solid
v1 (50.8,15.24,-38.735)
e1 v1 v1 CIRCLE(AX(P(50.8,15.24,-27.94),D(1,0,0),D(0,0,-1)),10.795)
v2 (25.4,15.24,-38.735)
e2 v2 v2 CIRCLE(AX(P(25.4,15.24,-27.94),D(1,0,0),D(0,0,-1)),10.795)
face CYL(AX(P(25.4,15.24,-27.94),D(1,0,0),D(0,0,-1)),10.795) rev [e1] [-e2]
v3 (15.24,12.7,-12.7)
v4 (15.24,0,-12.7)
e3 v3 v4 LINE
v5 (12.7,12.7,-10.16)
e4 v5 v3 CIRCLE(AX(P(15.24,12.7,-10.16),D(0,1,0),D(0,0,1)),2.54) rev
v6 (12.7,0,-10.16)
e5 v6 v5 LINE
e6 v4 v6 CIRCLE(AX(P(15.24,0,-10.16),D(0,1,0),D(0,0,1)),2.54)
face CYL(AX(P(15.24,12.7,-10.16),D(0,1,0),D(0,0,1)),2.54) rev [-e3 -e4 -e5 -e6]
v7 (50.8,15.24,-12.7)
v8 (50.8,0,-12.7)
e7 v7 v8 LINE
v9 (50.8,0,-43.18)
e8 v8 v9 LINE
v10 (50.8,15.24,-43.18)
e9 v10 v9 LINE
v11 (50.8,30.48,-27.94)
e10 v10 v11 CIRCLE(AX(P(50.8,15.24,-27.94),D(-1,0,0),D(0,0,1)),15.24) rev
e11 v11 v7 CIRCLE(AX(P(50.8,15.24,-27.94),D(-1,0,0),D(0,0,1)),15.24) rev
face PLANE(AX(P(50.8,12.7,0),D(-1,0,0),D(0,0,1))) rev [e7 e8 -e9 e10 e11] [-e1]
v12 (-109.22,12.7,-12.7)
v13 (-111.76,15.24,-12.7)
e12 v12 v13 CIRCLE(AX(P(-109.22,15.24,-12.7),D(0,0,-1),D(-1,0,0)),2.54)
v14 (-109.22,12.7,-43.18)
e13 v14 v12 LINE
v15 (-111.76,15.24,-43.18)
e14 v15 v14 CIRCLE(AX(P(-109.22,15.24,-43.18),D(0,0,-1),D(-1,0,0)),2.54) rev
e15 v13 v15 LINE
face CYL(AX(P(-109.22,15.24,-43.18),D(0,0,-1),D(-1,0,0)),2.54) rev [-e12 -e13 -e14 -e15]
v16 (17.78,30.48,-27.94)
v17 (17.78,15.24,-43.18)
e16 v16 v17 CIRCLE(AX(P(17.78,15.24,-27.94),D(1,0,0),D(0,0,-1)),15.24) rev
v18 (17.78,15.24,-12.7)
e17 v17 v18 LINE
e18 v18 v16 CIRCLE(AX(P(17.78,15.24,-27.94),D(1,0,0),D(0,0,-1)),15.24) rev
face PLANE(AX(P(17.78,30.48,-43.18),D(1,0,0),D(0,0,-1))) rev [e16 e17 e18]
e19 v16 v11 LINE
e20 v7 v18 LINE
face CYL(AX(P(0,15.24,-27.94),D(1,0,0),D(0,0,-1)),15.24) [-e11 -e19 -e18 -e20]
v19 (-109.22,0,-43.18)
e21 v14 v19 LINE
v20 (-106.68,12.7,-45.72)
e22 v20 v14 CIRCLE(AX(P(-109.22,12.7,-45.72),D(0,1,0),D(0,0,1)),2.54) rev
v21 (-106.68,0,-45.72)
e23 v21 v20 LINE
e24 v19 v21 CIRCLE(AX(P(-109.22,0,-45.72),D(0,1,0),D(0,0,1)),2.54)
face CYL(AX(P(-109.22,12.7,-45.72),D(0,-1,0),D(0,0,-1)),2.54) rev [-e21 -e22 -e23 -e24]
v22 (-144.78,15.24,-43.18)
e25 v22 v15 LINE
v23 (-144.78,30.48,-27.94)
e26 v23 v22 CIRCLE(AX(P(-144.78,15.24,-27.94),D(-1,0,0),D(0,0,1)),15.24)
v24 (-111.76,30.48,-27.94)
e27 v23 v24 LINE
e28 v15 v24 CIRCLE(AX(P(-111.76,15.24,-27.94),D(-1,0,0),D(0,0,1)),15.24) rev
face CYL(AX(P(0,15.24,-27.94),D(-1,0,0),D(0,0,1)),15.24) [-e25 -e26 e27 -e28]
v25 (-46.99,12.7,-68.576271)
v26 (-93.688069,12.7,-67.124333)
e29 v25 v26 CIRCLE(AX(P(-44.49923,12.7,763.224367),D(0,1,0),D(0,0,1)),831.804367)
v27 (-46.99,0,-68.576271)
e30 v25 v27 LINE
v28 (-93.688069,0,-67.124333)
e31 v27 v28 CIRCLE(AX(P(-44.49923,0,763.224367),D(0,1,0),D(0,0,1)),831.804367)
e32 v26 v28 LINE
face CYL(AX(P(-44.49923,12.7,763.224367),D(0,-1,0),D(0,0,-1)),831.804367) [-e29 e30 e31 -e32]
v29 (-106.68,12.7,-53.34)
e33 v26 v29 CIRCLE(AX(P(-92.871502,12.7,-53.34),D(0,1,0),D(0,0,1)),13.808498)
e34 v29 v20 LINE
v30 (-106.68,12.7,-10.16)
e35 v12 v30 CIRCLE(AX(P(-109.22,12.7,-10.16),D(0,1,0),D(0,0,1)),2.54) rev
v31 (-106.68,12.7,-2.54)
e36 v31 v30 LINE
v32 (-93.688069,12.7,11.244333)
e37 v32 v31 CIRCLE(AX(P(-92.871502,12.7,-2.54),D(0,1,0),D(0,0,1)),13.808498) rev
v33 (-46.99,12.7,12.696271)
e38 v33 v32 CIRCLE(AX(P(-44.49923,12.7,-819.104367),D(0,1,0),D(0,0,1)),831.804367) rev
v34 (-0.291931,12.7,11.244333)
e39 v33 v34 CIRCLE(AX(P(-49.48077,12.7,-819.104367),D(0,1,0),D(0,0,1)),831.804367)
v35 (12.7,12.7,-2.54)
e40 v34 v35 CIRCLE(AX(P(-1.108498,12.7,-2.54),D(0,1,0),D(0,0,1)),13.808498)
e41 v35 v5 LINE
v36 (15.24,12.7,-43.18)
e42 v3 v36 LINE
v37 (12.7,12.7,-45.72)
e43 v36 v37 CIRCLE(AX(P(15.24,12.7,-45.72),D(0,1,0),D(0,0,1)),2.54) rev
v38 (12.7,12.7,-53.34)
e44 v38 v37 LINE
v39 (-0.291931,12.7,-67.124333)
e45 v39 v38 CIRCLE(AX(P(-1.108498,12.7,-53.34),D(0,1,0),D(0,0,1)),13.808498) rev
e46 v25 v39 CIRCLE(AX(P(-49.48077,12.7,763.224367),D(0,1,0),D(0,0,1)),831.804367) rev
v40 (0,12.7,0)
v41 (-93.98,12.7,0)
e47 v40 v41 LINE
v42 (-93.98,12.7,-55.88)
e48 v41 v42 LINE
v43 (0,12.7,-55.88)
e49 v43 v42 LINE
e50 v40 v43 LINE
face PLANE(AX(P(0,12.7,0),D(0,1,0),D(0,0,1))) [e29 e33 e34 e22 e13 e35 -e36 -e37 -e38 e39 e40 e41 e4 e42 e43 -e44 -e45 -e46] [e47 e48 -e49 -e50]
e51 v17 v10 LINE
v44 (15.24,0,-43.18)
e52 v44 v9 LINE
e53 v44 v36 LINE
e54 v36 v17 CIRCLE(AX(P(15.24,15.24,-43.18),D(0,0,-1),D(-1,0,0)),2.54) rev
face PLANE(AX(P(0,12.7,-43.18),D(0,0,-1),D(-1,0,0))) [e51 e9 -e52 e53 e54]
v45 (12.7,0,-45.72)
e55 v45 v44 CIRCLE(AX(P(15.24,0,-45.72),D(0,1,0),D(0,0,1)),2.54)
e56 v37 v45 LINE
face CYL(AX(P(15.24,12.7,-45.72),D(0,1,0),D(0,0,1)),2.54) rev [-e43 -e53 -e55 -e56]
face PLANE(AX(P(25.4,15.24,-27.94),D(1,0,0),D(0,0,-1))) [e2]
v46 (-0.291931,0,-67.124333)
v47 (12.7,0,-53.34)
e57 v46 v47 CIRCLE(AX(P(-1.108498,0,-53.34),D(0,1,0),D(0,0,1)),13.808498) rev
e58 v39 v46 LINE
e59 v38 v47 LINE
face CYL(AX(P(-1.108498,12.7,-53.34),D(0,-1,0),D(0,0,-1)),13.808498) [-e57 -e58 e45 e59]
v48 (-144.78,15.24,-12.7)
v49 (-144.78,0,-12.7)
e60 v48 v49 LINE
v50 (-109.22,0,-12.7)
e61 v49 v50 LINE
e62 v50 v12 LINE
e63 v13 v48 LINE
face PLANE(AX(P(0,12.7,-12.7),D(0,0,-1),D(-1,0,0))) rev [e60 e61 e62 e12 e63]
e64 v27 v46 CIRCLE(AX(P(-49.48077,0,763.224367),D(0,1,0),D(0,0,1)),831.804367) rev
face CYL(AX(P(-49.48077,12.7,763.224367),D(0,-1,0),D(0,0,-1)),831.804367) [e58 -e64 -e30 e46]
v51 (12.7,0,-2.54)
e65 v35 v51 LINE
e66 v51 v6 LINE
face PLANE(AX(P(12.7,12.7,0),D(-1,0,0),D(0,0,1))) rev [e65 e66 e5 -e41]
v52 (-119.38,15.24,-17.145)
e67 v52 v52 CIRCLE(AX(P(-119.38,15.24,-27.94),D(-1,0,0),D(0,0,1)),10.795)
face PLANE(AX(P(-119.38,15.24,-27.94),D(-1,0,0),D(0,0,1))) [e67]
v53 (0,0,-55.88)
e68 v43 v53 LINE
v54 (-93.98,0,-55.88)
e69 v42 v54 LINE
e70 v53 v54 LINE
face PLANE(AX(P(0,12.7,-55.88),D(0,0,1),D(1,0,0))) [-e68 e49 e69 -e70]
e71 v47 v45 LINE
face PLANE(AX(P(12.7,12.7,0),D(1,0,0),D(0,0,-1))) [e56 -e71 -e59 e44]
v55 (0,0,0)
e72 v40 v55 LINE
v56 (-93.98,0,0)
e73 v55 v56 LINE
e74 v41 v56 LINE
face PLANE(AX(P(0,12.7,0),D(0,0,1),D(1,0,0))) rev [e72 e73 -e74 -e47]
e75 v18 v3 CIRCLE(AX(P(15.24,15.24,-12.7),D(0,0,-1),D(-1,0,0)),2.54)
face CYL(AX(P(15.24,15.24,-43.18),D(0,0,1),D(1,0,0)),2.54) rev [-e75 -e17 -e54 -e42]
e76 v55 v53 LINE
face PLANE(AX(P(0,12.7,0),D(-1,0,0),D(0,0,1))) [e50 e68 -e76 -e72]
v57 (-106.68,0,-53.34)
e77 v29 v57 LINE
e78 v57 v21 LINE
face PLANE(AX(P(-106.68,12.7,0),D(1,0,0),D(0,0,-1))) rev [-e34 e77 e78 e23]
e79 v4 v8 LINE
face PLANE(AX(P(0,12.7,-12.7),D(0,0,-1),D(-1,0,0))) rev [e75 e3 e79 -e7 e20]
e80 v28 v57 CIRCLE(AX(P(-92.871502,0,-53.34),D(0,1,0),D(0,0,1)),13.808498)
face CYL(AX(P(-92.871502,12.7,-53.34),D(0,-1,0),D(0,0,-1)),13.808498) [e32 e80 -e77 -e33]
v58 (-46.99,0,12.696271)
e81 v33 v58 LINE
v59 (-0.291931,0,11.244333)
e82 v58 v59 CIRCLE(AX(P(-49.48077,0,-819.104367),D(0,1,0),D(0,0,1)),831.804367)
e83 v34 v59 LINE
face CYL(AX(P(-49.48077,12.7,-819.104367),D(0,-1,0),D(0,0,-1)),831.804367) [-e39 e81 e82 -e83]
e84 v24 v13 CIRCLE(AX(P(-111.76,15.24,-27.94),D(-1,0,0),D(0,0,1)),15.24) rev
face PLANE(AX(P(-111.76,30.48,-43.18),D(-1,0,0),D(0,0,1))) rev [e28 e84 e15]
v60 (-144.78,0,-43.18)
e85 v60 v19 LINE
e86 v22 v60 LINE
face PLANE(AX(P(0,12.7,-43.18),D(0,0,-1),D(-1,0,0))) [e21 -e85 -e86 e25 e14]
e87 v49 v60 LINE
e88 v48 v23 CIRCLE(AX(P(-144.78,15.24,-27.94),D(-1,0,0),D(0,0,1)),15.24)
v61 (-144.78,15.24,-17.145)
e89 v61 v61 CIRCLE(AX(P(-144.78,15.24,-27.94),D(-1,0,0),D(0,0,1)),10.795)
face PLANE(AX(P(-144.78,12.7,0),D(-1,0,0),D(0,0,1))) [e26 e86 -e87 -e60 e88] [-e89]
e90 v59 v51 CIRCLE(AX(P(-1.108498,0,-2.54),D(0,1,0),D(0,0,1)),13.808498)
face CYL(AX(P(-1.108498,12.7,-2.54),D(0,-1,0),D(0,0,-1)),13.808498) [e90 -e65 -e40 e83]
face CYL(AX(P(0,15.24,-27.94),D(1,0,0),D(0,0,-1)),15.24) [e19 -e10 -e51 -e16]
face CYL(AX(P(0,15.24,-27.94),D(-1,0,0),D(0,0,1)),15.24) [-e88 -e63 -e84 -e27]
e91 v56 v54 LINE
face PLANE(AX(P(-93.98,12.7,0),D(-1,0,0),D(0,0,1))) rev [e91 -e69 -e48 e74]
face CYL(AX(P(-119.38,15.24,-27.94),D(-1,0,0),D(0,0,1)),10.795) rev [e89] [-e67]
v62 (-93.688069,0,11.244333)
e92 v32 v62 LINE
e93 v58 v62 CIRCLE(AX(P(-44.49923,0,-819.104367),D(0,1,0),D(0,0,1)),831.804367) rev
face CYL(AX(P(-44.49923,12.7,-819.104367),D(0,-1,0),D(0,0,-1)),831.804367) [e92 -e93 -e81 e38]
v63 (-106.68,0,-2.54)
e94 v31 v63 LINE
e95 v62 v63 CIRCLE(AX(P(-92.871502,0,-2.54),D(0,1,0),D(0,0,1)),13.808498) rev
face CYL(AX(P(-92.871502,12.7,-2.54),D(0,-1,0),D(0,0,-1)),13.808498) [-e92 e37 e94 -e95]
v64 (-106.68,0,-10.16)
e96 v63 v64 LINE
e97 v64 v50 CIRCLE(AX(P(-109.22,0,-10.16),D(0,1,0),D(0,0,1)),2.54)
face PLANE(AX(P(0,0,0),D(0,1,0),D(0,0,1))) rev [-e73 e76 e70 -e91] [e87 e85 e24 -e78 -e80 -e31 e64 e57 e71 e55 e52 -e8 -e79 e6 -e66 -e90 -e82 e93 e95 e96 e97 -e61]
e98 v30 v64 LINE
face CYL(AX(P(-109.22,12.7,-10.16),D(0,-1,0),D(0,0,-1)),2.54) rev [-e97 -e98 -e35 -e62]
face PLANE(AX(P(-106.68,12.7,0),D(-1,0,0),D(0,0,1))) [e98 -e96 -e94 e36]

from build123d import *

# Parameters (mm, degrees)
SKETCH2_W           = 93.98
SKETCH2_H           = 55.88
BOSS_EXTRUDE1_DEPTH = 12.7
SKETCH3_W           = 33.02
SKETCH3_H           = 30.48
BOSS_EXTRUDE2_DEPTH = 17.78
FILLET1_R           = 2.54
SKETCH4_R           = 10.795
CUT_EXTRUDE1_DEPTH  = 25.4
CUT_EXTRUDE2_START  = -25.4
SKETCH5_R           = 10.795
CUT_EXTRUDE2_DEPTH  = 25.4
FILLET2_R           = 2.54
FILLET3_R           = 15.24


with BuildPart() as part:
    # Sketch2 → Boss-Extrude1 (new body)
    with BuildSketch(Plane(origin=(0, 0, 0), x_dir=(1, 0, 0), z_dir=(0, 1, 0))):
        with BuildLine():
            ThreePointArc((-93.688069253, -11.244332686), (-70.349230661, -12.298232488), (-46.99, -12.696270789))
            ThreePointArc((-46.99, -12.696270789), (-23.630769339, -12.298232488), (-0.291930747, -11.244332686))
            ThreePointArc((-0.291930747, -11.244332686), (8.940138318, -6.930983214), (12.7, 2.54))
            Line((12.7, 2.54), (12.7, 12.7))
            Line((12.7, 12.7), (50.8, 12.7))
            Line((50.8, 12.7), (50.8, 43.18))
            Line((50.8, 43.18), (12.7, 43.18))
            Line((12.7, 43.18), (12.7, 53.34))
            ThreePointArc((12.7, 53.34), (8.940138318, 62.810983214), (-0.291930747, 67.124332686))
            ThreePointArc((-0.291930747, 67.124332686), (-23.630769339, 68.178232488), (-46.99, 68.576270789))
            ThreePointArc((-46.99, 68.576270789), (-70.349230661, 68.178232488), (-93.688069253, 67.124332686))
            ThreePointArc((-93.688069253, 67.124332686), (-102.920138318, 62.810983214), (-106.68, 53.34))
            Line((-106.68, 53.34), (-106.68, 43.18))
            Line((-106.68, 43.18), (-144.78, 43.18))
            Line((-144.78, 43.18), (-144.78, 12.7))
            Line((-144.78, 12.7), (-106.68, 12.7))
            Line((-106.68, 12.7), (-106.68, 2.54))
            ThreePointArc((-106.68, 2.54), (-102.920138318, -6.930983214), (-93.688069253, -11.244332686))
        make_face()
        with Locations((-46.99, 27.94)):
            Rectangle(SKETCH2_W, SKETCH2_H, mode=Mode.SUBTRACT)
    extrude(amount=BOSS_EXTRUDE1_DEPTH)

    # Sketch3 → Boss-Extrude2 (add)
    with BuildSketch(Plane(origin=(0, 12.7, 0), x_dir=(1, 0, 0), z_dir=(0, 1, 0))):
        with Locations((34.29, 27.94)):
            Rectangle(SKETCH3_W, SKETCH3_H)
        with Locations((-128.27, 27.94)):
            Rectangle(SKETCH3_W, SKETCH3_H)
    extrude(amount=BOSS_EXTRUDE2_DEPTH)

    # Fillet1
    fillet1_edges = [part.edges().sort_by_distance(p)[0] for p in [
        (17.78, 12.7, -27.94),
        (-111.76, 12.7, -27.94),
    ]]
    fillet(fillet1_edges, radius=FILLET1_R)

    # Sketch4 → Cut-Extrude1 (cut)
    with BuildSketch(Plane(origin=(50.8, 0, 0), x_dir=(0, 0, -1), z_dir=(1, 0, 0))):
        with Locations((27.94, 15.24)):
            Circle(SKETCH4_R)
    extrude(amount=-CUT_EXTRUDE1_DEPTH, mode=Mode.SUBTRACT)

    # Sketch5 → Cut-Extrude2 (cut)
    with BuildSketch(Plane.ZY.offset(144.78).offset(CUT_EXTRUDE2_START)):
        with Locations(Location((-27.94, 15.24, 0), (0, 0, 180))):
            Circle(SKETCH5_R)
    extrude(amount=CUT_EXTRUDE2_DEPTH, mode=Mode.SUBTRACT)

    # Fillet2
    fillet2_edges = [part.edges().sort_by_distance(p)[0] for p in [
        (12.7, 6.35, -43.18),
        (12.7, 6.35, -12.7),
        (-106.68, 6.35, -43.18),
        (-106.68, 6.35, -12.7),
    ]]
    fillet(fillet2_edges, radius=FILLET2_R)

    # Fillet3
    fillet3_edges = [part.edges().sort_by_distance(p)[0] for p in [
        (34.29, 30.48, -43.18),
        (34.29, 30.48, -12.7),
        (-128.27, 30.48, -43.18),
        (-128.27, 30.48, -12.7),
    ]]
    fillet(fillet3_edges, radius=FILLET3_R - 0.0001)  # a hair under: the kernel refuses the full size


solid = part.part
